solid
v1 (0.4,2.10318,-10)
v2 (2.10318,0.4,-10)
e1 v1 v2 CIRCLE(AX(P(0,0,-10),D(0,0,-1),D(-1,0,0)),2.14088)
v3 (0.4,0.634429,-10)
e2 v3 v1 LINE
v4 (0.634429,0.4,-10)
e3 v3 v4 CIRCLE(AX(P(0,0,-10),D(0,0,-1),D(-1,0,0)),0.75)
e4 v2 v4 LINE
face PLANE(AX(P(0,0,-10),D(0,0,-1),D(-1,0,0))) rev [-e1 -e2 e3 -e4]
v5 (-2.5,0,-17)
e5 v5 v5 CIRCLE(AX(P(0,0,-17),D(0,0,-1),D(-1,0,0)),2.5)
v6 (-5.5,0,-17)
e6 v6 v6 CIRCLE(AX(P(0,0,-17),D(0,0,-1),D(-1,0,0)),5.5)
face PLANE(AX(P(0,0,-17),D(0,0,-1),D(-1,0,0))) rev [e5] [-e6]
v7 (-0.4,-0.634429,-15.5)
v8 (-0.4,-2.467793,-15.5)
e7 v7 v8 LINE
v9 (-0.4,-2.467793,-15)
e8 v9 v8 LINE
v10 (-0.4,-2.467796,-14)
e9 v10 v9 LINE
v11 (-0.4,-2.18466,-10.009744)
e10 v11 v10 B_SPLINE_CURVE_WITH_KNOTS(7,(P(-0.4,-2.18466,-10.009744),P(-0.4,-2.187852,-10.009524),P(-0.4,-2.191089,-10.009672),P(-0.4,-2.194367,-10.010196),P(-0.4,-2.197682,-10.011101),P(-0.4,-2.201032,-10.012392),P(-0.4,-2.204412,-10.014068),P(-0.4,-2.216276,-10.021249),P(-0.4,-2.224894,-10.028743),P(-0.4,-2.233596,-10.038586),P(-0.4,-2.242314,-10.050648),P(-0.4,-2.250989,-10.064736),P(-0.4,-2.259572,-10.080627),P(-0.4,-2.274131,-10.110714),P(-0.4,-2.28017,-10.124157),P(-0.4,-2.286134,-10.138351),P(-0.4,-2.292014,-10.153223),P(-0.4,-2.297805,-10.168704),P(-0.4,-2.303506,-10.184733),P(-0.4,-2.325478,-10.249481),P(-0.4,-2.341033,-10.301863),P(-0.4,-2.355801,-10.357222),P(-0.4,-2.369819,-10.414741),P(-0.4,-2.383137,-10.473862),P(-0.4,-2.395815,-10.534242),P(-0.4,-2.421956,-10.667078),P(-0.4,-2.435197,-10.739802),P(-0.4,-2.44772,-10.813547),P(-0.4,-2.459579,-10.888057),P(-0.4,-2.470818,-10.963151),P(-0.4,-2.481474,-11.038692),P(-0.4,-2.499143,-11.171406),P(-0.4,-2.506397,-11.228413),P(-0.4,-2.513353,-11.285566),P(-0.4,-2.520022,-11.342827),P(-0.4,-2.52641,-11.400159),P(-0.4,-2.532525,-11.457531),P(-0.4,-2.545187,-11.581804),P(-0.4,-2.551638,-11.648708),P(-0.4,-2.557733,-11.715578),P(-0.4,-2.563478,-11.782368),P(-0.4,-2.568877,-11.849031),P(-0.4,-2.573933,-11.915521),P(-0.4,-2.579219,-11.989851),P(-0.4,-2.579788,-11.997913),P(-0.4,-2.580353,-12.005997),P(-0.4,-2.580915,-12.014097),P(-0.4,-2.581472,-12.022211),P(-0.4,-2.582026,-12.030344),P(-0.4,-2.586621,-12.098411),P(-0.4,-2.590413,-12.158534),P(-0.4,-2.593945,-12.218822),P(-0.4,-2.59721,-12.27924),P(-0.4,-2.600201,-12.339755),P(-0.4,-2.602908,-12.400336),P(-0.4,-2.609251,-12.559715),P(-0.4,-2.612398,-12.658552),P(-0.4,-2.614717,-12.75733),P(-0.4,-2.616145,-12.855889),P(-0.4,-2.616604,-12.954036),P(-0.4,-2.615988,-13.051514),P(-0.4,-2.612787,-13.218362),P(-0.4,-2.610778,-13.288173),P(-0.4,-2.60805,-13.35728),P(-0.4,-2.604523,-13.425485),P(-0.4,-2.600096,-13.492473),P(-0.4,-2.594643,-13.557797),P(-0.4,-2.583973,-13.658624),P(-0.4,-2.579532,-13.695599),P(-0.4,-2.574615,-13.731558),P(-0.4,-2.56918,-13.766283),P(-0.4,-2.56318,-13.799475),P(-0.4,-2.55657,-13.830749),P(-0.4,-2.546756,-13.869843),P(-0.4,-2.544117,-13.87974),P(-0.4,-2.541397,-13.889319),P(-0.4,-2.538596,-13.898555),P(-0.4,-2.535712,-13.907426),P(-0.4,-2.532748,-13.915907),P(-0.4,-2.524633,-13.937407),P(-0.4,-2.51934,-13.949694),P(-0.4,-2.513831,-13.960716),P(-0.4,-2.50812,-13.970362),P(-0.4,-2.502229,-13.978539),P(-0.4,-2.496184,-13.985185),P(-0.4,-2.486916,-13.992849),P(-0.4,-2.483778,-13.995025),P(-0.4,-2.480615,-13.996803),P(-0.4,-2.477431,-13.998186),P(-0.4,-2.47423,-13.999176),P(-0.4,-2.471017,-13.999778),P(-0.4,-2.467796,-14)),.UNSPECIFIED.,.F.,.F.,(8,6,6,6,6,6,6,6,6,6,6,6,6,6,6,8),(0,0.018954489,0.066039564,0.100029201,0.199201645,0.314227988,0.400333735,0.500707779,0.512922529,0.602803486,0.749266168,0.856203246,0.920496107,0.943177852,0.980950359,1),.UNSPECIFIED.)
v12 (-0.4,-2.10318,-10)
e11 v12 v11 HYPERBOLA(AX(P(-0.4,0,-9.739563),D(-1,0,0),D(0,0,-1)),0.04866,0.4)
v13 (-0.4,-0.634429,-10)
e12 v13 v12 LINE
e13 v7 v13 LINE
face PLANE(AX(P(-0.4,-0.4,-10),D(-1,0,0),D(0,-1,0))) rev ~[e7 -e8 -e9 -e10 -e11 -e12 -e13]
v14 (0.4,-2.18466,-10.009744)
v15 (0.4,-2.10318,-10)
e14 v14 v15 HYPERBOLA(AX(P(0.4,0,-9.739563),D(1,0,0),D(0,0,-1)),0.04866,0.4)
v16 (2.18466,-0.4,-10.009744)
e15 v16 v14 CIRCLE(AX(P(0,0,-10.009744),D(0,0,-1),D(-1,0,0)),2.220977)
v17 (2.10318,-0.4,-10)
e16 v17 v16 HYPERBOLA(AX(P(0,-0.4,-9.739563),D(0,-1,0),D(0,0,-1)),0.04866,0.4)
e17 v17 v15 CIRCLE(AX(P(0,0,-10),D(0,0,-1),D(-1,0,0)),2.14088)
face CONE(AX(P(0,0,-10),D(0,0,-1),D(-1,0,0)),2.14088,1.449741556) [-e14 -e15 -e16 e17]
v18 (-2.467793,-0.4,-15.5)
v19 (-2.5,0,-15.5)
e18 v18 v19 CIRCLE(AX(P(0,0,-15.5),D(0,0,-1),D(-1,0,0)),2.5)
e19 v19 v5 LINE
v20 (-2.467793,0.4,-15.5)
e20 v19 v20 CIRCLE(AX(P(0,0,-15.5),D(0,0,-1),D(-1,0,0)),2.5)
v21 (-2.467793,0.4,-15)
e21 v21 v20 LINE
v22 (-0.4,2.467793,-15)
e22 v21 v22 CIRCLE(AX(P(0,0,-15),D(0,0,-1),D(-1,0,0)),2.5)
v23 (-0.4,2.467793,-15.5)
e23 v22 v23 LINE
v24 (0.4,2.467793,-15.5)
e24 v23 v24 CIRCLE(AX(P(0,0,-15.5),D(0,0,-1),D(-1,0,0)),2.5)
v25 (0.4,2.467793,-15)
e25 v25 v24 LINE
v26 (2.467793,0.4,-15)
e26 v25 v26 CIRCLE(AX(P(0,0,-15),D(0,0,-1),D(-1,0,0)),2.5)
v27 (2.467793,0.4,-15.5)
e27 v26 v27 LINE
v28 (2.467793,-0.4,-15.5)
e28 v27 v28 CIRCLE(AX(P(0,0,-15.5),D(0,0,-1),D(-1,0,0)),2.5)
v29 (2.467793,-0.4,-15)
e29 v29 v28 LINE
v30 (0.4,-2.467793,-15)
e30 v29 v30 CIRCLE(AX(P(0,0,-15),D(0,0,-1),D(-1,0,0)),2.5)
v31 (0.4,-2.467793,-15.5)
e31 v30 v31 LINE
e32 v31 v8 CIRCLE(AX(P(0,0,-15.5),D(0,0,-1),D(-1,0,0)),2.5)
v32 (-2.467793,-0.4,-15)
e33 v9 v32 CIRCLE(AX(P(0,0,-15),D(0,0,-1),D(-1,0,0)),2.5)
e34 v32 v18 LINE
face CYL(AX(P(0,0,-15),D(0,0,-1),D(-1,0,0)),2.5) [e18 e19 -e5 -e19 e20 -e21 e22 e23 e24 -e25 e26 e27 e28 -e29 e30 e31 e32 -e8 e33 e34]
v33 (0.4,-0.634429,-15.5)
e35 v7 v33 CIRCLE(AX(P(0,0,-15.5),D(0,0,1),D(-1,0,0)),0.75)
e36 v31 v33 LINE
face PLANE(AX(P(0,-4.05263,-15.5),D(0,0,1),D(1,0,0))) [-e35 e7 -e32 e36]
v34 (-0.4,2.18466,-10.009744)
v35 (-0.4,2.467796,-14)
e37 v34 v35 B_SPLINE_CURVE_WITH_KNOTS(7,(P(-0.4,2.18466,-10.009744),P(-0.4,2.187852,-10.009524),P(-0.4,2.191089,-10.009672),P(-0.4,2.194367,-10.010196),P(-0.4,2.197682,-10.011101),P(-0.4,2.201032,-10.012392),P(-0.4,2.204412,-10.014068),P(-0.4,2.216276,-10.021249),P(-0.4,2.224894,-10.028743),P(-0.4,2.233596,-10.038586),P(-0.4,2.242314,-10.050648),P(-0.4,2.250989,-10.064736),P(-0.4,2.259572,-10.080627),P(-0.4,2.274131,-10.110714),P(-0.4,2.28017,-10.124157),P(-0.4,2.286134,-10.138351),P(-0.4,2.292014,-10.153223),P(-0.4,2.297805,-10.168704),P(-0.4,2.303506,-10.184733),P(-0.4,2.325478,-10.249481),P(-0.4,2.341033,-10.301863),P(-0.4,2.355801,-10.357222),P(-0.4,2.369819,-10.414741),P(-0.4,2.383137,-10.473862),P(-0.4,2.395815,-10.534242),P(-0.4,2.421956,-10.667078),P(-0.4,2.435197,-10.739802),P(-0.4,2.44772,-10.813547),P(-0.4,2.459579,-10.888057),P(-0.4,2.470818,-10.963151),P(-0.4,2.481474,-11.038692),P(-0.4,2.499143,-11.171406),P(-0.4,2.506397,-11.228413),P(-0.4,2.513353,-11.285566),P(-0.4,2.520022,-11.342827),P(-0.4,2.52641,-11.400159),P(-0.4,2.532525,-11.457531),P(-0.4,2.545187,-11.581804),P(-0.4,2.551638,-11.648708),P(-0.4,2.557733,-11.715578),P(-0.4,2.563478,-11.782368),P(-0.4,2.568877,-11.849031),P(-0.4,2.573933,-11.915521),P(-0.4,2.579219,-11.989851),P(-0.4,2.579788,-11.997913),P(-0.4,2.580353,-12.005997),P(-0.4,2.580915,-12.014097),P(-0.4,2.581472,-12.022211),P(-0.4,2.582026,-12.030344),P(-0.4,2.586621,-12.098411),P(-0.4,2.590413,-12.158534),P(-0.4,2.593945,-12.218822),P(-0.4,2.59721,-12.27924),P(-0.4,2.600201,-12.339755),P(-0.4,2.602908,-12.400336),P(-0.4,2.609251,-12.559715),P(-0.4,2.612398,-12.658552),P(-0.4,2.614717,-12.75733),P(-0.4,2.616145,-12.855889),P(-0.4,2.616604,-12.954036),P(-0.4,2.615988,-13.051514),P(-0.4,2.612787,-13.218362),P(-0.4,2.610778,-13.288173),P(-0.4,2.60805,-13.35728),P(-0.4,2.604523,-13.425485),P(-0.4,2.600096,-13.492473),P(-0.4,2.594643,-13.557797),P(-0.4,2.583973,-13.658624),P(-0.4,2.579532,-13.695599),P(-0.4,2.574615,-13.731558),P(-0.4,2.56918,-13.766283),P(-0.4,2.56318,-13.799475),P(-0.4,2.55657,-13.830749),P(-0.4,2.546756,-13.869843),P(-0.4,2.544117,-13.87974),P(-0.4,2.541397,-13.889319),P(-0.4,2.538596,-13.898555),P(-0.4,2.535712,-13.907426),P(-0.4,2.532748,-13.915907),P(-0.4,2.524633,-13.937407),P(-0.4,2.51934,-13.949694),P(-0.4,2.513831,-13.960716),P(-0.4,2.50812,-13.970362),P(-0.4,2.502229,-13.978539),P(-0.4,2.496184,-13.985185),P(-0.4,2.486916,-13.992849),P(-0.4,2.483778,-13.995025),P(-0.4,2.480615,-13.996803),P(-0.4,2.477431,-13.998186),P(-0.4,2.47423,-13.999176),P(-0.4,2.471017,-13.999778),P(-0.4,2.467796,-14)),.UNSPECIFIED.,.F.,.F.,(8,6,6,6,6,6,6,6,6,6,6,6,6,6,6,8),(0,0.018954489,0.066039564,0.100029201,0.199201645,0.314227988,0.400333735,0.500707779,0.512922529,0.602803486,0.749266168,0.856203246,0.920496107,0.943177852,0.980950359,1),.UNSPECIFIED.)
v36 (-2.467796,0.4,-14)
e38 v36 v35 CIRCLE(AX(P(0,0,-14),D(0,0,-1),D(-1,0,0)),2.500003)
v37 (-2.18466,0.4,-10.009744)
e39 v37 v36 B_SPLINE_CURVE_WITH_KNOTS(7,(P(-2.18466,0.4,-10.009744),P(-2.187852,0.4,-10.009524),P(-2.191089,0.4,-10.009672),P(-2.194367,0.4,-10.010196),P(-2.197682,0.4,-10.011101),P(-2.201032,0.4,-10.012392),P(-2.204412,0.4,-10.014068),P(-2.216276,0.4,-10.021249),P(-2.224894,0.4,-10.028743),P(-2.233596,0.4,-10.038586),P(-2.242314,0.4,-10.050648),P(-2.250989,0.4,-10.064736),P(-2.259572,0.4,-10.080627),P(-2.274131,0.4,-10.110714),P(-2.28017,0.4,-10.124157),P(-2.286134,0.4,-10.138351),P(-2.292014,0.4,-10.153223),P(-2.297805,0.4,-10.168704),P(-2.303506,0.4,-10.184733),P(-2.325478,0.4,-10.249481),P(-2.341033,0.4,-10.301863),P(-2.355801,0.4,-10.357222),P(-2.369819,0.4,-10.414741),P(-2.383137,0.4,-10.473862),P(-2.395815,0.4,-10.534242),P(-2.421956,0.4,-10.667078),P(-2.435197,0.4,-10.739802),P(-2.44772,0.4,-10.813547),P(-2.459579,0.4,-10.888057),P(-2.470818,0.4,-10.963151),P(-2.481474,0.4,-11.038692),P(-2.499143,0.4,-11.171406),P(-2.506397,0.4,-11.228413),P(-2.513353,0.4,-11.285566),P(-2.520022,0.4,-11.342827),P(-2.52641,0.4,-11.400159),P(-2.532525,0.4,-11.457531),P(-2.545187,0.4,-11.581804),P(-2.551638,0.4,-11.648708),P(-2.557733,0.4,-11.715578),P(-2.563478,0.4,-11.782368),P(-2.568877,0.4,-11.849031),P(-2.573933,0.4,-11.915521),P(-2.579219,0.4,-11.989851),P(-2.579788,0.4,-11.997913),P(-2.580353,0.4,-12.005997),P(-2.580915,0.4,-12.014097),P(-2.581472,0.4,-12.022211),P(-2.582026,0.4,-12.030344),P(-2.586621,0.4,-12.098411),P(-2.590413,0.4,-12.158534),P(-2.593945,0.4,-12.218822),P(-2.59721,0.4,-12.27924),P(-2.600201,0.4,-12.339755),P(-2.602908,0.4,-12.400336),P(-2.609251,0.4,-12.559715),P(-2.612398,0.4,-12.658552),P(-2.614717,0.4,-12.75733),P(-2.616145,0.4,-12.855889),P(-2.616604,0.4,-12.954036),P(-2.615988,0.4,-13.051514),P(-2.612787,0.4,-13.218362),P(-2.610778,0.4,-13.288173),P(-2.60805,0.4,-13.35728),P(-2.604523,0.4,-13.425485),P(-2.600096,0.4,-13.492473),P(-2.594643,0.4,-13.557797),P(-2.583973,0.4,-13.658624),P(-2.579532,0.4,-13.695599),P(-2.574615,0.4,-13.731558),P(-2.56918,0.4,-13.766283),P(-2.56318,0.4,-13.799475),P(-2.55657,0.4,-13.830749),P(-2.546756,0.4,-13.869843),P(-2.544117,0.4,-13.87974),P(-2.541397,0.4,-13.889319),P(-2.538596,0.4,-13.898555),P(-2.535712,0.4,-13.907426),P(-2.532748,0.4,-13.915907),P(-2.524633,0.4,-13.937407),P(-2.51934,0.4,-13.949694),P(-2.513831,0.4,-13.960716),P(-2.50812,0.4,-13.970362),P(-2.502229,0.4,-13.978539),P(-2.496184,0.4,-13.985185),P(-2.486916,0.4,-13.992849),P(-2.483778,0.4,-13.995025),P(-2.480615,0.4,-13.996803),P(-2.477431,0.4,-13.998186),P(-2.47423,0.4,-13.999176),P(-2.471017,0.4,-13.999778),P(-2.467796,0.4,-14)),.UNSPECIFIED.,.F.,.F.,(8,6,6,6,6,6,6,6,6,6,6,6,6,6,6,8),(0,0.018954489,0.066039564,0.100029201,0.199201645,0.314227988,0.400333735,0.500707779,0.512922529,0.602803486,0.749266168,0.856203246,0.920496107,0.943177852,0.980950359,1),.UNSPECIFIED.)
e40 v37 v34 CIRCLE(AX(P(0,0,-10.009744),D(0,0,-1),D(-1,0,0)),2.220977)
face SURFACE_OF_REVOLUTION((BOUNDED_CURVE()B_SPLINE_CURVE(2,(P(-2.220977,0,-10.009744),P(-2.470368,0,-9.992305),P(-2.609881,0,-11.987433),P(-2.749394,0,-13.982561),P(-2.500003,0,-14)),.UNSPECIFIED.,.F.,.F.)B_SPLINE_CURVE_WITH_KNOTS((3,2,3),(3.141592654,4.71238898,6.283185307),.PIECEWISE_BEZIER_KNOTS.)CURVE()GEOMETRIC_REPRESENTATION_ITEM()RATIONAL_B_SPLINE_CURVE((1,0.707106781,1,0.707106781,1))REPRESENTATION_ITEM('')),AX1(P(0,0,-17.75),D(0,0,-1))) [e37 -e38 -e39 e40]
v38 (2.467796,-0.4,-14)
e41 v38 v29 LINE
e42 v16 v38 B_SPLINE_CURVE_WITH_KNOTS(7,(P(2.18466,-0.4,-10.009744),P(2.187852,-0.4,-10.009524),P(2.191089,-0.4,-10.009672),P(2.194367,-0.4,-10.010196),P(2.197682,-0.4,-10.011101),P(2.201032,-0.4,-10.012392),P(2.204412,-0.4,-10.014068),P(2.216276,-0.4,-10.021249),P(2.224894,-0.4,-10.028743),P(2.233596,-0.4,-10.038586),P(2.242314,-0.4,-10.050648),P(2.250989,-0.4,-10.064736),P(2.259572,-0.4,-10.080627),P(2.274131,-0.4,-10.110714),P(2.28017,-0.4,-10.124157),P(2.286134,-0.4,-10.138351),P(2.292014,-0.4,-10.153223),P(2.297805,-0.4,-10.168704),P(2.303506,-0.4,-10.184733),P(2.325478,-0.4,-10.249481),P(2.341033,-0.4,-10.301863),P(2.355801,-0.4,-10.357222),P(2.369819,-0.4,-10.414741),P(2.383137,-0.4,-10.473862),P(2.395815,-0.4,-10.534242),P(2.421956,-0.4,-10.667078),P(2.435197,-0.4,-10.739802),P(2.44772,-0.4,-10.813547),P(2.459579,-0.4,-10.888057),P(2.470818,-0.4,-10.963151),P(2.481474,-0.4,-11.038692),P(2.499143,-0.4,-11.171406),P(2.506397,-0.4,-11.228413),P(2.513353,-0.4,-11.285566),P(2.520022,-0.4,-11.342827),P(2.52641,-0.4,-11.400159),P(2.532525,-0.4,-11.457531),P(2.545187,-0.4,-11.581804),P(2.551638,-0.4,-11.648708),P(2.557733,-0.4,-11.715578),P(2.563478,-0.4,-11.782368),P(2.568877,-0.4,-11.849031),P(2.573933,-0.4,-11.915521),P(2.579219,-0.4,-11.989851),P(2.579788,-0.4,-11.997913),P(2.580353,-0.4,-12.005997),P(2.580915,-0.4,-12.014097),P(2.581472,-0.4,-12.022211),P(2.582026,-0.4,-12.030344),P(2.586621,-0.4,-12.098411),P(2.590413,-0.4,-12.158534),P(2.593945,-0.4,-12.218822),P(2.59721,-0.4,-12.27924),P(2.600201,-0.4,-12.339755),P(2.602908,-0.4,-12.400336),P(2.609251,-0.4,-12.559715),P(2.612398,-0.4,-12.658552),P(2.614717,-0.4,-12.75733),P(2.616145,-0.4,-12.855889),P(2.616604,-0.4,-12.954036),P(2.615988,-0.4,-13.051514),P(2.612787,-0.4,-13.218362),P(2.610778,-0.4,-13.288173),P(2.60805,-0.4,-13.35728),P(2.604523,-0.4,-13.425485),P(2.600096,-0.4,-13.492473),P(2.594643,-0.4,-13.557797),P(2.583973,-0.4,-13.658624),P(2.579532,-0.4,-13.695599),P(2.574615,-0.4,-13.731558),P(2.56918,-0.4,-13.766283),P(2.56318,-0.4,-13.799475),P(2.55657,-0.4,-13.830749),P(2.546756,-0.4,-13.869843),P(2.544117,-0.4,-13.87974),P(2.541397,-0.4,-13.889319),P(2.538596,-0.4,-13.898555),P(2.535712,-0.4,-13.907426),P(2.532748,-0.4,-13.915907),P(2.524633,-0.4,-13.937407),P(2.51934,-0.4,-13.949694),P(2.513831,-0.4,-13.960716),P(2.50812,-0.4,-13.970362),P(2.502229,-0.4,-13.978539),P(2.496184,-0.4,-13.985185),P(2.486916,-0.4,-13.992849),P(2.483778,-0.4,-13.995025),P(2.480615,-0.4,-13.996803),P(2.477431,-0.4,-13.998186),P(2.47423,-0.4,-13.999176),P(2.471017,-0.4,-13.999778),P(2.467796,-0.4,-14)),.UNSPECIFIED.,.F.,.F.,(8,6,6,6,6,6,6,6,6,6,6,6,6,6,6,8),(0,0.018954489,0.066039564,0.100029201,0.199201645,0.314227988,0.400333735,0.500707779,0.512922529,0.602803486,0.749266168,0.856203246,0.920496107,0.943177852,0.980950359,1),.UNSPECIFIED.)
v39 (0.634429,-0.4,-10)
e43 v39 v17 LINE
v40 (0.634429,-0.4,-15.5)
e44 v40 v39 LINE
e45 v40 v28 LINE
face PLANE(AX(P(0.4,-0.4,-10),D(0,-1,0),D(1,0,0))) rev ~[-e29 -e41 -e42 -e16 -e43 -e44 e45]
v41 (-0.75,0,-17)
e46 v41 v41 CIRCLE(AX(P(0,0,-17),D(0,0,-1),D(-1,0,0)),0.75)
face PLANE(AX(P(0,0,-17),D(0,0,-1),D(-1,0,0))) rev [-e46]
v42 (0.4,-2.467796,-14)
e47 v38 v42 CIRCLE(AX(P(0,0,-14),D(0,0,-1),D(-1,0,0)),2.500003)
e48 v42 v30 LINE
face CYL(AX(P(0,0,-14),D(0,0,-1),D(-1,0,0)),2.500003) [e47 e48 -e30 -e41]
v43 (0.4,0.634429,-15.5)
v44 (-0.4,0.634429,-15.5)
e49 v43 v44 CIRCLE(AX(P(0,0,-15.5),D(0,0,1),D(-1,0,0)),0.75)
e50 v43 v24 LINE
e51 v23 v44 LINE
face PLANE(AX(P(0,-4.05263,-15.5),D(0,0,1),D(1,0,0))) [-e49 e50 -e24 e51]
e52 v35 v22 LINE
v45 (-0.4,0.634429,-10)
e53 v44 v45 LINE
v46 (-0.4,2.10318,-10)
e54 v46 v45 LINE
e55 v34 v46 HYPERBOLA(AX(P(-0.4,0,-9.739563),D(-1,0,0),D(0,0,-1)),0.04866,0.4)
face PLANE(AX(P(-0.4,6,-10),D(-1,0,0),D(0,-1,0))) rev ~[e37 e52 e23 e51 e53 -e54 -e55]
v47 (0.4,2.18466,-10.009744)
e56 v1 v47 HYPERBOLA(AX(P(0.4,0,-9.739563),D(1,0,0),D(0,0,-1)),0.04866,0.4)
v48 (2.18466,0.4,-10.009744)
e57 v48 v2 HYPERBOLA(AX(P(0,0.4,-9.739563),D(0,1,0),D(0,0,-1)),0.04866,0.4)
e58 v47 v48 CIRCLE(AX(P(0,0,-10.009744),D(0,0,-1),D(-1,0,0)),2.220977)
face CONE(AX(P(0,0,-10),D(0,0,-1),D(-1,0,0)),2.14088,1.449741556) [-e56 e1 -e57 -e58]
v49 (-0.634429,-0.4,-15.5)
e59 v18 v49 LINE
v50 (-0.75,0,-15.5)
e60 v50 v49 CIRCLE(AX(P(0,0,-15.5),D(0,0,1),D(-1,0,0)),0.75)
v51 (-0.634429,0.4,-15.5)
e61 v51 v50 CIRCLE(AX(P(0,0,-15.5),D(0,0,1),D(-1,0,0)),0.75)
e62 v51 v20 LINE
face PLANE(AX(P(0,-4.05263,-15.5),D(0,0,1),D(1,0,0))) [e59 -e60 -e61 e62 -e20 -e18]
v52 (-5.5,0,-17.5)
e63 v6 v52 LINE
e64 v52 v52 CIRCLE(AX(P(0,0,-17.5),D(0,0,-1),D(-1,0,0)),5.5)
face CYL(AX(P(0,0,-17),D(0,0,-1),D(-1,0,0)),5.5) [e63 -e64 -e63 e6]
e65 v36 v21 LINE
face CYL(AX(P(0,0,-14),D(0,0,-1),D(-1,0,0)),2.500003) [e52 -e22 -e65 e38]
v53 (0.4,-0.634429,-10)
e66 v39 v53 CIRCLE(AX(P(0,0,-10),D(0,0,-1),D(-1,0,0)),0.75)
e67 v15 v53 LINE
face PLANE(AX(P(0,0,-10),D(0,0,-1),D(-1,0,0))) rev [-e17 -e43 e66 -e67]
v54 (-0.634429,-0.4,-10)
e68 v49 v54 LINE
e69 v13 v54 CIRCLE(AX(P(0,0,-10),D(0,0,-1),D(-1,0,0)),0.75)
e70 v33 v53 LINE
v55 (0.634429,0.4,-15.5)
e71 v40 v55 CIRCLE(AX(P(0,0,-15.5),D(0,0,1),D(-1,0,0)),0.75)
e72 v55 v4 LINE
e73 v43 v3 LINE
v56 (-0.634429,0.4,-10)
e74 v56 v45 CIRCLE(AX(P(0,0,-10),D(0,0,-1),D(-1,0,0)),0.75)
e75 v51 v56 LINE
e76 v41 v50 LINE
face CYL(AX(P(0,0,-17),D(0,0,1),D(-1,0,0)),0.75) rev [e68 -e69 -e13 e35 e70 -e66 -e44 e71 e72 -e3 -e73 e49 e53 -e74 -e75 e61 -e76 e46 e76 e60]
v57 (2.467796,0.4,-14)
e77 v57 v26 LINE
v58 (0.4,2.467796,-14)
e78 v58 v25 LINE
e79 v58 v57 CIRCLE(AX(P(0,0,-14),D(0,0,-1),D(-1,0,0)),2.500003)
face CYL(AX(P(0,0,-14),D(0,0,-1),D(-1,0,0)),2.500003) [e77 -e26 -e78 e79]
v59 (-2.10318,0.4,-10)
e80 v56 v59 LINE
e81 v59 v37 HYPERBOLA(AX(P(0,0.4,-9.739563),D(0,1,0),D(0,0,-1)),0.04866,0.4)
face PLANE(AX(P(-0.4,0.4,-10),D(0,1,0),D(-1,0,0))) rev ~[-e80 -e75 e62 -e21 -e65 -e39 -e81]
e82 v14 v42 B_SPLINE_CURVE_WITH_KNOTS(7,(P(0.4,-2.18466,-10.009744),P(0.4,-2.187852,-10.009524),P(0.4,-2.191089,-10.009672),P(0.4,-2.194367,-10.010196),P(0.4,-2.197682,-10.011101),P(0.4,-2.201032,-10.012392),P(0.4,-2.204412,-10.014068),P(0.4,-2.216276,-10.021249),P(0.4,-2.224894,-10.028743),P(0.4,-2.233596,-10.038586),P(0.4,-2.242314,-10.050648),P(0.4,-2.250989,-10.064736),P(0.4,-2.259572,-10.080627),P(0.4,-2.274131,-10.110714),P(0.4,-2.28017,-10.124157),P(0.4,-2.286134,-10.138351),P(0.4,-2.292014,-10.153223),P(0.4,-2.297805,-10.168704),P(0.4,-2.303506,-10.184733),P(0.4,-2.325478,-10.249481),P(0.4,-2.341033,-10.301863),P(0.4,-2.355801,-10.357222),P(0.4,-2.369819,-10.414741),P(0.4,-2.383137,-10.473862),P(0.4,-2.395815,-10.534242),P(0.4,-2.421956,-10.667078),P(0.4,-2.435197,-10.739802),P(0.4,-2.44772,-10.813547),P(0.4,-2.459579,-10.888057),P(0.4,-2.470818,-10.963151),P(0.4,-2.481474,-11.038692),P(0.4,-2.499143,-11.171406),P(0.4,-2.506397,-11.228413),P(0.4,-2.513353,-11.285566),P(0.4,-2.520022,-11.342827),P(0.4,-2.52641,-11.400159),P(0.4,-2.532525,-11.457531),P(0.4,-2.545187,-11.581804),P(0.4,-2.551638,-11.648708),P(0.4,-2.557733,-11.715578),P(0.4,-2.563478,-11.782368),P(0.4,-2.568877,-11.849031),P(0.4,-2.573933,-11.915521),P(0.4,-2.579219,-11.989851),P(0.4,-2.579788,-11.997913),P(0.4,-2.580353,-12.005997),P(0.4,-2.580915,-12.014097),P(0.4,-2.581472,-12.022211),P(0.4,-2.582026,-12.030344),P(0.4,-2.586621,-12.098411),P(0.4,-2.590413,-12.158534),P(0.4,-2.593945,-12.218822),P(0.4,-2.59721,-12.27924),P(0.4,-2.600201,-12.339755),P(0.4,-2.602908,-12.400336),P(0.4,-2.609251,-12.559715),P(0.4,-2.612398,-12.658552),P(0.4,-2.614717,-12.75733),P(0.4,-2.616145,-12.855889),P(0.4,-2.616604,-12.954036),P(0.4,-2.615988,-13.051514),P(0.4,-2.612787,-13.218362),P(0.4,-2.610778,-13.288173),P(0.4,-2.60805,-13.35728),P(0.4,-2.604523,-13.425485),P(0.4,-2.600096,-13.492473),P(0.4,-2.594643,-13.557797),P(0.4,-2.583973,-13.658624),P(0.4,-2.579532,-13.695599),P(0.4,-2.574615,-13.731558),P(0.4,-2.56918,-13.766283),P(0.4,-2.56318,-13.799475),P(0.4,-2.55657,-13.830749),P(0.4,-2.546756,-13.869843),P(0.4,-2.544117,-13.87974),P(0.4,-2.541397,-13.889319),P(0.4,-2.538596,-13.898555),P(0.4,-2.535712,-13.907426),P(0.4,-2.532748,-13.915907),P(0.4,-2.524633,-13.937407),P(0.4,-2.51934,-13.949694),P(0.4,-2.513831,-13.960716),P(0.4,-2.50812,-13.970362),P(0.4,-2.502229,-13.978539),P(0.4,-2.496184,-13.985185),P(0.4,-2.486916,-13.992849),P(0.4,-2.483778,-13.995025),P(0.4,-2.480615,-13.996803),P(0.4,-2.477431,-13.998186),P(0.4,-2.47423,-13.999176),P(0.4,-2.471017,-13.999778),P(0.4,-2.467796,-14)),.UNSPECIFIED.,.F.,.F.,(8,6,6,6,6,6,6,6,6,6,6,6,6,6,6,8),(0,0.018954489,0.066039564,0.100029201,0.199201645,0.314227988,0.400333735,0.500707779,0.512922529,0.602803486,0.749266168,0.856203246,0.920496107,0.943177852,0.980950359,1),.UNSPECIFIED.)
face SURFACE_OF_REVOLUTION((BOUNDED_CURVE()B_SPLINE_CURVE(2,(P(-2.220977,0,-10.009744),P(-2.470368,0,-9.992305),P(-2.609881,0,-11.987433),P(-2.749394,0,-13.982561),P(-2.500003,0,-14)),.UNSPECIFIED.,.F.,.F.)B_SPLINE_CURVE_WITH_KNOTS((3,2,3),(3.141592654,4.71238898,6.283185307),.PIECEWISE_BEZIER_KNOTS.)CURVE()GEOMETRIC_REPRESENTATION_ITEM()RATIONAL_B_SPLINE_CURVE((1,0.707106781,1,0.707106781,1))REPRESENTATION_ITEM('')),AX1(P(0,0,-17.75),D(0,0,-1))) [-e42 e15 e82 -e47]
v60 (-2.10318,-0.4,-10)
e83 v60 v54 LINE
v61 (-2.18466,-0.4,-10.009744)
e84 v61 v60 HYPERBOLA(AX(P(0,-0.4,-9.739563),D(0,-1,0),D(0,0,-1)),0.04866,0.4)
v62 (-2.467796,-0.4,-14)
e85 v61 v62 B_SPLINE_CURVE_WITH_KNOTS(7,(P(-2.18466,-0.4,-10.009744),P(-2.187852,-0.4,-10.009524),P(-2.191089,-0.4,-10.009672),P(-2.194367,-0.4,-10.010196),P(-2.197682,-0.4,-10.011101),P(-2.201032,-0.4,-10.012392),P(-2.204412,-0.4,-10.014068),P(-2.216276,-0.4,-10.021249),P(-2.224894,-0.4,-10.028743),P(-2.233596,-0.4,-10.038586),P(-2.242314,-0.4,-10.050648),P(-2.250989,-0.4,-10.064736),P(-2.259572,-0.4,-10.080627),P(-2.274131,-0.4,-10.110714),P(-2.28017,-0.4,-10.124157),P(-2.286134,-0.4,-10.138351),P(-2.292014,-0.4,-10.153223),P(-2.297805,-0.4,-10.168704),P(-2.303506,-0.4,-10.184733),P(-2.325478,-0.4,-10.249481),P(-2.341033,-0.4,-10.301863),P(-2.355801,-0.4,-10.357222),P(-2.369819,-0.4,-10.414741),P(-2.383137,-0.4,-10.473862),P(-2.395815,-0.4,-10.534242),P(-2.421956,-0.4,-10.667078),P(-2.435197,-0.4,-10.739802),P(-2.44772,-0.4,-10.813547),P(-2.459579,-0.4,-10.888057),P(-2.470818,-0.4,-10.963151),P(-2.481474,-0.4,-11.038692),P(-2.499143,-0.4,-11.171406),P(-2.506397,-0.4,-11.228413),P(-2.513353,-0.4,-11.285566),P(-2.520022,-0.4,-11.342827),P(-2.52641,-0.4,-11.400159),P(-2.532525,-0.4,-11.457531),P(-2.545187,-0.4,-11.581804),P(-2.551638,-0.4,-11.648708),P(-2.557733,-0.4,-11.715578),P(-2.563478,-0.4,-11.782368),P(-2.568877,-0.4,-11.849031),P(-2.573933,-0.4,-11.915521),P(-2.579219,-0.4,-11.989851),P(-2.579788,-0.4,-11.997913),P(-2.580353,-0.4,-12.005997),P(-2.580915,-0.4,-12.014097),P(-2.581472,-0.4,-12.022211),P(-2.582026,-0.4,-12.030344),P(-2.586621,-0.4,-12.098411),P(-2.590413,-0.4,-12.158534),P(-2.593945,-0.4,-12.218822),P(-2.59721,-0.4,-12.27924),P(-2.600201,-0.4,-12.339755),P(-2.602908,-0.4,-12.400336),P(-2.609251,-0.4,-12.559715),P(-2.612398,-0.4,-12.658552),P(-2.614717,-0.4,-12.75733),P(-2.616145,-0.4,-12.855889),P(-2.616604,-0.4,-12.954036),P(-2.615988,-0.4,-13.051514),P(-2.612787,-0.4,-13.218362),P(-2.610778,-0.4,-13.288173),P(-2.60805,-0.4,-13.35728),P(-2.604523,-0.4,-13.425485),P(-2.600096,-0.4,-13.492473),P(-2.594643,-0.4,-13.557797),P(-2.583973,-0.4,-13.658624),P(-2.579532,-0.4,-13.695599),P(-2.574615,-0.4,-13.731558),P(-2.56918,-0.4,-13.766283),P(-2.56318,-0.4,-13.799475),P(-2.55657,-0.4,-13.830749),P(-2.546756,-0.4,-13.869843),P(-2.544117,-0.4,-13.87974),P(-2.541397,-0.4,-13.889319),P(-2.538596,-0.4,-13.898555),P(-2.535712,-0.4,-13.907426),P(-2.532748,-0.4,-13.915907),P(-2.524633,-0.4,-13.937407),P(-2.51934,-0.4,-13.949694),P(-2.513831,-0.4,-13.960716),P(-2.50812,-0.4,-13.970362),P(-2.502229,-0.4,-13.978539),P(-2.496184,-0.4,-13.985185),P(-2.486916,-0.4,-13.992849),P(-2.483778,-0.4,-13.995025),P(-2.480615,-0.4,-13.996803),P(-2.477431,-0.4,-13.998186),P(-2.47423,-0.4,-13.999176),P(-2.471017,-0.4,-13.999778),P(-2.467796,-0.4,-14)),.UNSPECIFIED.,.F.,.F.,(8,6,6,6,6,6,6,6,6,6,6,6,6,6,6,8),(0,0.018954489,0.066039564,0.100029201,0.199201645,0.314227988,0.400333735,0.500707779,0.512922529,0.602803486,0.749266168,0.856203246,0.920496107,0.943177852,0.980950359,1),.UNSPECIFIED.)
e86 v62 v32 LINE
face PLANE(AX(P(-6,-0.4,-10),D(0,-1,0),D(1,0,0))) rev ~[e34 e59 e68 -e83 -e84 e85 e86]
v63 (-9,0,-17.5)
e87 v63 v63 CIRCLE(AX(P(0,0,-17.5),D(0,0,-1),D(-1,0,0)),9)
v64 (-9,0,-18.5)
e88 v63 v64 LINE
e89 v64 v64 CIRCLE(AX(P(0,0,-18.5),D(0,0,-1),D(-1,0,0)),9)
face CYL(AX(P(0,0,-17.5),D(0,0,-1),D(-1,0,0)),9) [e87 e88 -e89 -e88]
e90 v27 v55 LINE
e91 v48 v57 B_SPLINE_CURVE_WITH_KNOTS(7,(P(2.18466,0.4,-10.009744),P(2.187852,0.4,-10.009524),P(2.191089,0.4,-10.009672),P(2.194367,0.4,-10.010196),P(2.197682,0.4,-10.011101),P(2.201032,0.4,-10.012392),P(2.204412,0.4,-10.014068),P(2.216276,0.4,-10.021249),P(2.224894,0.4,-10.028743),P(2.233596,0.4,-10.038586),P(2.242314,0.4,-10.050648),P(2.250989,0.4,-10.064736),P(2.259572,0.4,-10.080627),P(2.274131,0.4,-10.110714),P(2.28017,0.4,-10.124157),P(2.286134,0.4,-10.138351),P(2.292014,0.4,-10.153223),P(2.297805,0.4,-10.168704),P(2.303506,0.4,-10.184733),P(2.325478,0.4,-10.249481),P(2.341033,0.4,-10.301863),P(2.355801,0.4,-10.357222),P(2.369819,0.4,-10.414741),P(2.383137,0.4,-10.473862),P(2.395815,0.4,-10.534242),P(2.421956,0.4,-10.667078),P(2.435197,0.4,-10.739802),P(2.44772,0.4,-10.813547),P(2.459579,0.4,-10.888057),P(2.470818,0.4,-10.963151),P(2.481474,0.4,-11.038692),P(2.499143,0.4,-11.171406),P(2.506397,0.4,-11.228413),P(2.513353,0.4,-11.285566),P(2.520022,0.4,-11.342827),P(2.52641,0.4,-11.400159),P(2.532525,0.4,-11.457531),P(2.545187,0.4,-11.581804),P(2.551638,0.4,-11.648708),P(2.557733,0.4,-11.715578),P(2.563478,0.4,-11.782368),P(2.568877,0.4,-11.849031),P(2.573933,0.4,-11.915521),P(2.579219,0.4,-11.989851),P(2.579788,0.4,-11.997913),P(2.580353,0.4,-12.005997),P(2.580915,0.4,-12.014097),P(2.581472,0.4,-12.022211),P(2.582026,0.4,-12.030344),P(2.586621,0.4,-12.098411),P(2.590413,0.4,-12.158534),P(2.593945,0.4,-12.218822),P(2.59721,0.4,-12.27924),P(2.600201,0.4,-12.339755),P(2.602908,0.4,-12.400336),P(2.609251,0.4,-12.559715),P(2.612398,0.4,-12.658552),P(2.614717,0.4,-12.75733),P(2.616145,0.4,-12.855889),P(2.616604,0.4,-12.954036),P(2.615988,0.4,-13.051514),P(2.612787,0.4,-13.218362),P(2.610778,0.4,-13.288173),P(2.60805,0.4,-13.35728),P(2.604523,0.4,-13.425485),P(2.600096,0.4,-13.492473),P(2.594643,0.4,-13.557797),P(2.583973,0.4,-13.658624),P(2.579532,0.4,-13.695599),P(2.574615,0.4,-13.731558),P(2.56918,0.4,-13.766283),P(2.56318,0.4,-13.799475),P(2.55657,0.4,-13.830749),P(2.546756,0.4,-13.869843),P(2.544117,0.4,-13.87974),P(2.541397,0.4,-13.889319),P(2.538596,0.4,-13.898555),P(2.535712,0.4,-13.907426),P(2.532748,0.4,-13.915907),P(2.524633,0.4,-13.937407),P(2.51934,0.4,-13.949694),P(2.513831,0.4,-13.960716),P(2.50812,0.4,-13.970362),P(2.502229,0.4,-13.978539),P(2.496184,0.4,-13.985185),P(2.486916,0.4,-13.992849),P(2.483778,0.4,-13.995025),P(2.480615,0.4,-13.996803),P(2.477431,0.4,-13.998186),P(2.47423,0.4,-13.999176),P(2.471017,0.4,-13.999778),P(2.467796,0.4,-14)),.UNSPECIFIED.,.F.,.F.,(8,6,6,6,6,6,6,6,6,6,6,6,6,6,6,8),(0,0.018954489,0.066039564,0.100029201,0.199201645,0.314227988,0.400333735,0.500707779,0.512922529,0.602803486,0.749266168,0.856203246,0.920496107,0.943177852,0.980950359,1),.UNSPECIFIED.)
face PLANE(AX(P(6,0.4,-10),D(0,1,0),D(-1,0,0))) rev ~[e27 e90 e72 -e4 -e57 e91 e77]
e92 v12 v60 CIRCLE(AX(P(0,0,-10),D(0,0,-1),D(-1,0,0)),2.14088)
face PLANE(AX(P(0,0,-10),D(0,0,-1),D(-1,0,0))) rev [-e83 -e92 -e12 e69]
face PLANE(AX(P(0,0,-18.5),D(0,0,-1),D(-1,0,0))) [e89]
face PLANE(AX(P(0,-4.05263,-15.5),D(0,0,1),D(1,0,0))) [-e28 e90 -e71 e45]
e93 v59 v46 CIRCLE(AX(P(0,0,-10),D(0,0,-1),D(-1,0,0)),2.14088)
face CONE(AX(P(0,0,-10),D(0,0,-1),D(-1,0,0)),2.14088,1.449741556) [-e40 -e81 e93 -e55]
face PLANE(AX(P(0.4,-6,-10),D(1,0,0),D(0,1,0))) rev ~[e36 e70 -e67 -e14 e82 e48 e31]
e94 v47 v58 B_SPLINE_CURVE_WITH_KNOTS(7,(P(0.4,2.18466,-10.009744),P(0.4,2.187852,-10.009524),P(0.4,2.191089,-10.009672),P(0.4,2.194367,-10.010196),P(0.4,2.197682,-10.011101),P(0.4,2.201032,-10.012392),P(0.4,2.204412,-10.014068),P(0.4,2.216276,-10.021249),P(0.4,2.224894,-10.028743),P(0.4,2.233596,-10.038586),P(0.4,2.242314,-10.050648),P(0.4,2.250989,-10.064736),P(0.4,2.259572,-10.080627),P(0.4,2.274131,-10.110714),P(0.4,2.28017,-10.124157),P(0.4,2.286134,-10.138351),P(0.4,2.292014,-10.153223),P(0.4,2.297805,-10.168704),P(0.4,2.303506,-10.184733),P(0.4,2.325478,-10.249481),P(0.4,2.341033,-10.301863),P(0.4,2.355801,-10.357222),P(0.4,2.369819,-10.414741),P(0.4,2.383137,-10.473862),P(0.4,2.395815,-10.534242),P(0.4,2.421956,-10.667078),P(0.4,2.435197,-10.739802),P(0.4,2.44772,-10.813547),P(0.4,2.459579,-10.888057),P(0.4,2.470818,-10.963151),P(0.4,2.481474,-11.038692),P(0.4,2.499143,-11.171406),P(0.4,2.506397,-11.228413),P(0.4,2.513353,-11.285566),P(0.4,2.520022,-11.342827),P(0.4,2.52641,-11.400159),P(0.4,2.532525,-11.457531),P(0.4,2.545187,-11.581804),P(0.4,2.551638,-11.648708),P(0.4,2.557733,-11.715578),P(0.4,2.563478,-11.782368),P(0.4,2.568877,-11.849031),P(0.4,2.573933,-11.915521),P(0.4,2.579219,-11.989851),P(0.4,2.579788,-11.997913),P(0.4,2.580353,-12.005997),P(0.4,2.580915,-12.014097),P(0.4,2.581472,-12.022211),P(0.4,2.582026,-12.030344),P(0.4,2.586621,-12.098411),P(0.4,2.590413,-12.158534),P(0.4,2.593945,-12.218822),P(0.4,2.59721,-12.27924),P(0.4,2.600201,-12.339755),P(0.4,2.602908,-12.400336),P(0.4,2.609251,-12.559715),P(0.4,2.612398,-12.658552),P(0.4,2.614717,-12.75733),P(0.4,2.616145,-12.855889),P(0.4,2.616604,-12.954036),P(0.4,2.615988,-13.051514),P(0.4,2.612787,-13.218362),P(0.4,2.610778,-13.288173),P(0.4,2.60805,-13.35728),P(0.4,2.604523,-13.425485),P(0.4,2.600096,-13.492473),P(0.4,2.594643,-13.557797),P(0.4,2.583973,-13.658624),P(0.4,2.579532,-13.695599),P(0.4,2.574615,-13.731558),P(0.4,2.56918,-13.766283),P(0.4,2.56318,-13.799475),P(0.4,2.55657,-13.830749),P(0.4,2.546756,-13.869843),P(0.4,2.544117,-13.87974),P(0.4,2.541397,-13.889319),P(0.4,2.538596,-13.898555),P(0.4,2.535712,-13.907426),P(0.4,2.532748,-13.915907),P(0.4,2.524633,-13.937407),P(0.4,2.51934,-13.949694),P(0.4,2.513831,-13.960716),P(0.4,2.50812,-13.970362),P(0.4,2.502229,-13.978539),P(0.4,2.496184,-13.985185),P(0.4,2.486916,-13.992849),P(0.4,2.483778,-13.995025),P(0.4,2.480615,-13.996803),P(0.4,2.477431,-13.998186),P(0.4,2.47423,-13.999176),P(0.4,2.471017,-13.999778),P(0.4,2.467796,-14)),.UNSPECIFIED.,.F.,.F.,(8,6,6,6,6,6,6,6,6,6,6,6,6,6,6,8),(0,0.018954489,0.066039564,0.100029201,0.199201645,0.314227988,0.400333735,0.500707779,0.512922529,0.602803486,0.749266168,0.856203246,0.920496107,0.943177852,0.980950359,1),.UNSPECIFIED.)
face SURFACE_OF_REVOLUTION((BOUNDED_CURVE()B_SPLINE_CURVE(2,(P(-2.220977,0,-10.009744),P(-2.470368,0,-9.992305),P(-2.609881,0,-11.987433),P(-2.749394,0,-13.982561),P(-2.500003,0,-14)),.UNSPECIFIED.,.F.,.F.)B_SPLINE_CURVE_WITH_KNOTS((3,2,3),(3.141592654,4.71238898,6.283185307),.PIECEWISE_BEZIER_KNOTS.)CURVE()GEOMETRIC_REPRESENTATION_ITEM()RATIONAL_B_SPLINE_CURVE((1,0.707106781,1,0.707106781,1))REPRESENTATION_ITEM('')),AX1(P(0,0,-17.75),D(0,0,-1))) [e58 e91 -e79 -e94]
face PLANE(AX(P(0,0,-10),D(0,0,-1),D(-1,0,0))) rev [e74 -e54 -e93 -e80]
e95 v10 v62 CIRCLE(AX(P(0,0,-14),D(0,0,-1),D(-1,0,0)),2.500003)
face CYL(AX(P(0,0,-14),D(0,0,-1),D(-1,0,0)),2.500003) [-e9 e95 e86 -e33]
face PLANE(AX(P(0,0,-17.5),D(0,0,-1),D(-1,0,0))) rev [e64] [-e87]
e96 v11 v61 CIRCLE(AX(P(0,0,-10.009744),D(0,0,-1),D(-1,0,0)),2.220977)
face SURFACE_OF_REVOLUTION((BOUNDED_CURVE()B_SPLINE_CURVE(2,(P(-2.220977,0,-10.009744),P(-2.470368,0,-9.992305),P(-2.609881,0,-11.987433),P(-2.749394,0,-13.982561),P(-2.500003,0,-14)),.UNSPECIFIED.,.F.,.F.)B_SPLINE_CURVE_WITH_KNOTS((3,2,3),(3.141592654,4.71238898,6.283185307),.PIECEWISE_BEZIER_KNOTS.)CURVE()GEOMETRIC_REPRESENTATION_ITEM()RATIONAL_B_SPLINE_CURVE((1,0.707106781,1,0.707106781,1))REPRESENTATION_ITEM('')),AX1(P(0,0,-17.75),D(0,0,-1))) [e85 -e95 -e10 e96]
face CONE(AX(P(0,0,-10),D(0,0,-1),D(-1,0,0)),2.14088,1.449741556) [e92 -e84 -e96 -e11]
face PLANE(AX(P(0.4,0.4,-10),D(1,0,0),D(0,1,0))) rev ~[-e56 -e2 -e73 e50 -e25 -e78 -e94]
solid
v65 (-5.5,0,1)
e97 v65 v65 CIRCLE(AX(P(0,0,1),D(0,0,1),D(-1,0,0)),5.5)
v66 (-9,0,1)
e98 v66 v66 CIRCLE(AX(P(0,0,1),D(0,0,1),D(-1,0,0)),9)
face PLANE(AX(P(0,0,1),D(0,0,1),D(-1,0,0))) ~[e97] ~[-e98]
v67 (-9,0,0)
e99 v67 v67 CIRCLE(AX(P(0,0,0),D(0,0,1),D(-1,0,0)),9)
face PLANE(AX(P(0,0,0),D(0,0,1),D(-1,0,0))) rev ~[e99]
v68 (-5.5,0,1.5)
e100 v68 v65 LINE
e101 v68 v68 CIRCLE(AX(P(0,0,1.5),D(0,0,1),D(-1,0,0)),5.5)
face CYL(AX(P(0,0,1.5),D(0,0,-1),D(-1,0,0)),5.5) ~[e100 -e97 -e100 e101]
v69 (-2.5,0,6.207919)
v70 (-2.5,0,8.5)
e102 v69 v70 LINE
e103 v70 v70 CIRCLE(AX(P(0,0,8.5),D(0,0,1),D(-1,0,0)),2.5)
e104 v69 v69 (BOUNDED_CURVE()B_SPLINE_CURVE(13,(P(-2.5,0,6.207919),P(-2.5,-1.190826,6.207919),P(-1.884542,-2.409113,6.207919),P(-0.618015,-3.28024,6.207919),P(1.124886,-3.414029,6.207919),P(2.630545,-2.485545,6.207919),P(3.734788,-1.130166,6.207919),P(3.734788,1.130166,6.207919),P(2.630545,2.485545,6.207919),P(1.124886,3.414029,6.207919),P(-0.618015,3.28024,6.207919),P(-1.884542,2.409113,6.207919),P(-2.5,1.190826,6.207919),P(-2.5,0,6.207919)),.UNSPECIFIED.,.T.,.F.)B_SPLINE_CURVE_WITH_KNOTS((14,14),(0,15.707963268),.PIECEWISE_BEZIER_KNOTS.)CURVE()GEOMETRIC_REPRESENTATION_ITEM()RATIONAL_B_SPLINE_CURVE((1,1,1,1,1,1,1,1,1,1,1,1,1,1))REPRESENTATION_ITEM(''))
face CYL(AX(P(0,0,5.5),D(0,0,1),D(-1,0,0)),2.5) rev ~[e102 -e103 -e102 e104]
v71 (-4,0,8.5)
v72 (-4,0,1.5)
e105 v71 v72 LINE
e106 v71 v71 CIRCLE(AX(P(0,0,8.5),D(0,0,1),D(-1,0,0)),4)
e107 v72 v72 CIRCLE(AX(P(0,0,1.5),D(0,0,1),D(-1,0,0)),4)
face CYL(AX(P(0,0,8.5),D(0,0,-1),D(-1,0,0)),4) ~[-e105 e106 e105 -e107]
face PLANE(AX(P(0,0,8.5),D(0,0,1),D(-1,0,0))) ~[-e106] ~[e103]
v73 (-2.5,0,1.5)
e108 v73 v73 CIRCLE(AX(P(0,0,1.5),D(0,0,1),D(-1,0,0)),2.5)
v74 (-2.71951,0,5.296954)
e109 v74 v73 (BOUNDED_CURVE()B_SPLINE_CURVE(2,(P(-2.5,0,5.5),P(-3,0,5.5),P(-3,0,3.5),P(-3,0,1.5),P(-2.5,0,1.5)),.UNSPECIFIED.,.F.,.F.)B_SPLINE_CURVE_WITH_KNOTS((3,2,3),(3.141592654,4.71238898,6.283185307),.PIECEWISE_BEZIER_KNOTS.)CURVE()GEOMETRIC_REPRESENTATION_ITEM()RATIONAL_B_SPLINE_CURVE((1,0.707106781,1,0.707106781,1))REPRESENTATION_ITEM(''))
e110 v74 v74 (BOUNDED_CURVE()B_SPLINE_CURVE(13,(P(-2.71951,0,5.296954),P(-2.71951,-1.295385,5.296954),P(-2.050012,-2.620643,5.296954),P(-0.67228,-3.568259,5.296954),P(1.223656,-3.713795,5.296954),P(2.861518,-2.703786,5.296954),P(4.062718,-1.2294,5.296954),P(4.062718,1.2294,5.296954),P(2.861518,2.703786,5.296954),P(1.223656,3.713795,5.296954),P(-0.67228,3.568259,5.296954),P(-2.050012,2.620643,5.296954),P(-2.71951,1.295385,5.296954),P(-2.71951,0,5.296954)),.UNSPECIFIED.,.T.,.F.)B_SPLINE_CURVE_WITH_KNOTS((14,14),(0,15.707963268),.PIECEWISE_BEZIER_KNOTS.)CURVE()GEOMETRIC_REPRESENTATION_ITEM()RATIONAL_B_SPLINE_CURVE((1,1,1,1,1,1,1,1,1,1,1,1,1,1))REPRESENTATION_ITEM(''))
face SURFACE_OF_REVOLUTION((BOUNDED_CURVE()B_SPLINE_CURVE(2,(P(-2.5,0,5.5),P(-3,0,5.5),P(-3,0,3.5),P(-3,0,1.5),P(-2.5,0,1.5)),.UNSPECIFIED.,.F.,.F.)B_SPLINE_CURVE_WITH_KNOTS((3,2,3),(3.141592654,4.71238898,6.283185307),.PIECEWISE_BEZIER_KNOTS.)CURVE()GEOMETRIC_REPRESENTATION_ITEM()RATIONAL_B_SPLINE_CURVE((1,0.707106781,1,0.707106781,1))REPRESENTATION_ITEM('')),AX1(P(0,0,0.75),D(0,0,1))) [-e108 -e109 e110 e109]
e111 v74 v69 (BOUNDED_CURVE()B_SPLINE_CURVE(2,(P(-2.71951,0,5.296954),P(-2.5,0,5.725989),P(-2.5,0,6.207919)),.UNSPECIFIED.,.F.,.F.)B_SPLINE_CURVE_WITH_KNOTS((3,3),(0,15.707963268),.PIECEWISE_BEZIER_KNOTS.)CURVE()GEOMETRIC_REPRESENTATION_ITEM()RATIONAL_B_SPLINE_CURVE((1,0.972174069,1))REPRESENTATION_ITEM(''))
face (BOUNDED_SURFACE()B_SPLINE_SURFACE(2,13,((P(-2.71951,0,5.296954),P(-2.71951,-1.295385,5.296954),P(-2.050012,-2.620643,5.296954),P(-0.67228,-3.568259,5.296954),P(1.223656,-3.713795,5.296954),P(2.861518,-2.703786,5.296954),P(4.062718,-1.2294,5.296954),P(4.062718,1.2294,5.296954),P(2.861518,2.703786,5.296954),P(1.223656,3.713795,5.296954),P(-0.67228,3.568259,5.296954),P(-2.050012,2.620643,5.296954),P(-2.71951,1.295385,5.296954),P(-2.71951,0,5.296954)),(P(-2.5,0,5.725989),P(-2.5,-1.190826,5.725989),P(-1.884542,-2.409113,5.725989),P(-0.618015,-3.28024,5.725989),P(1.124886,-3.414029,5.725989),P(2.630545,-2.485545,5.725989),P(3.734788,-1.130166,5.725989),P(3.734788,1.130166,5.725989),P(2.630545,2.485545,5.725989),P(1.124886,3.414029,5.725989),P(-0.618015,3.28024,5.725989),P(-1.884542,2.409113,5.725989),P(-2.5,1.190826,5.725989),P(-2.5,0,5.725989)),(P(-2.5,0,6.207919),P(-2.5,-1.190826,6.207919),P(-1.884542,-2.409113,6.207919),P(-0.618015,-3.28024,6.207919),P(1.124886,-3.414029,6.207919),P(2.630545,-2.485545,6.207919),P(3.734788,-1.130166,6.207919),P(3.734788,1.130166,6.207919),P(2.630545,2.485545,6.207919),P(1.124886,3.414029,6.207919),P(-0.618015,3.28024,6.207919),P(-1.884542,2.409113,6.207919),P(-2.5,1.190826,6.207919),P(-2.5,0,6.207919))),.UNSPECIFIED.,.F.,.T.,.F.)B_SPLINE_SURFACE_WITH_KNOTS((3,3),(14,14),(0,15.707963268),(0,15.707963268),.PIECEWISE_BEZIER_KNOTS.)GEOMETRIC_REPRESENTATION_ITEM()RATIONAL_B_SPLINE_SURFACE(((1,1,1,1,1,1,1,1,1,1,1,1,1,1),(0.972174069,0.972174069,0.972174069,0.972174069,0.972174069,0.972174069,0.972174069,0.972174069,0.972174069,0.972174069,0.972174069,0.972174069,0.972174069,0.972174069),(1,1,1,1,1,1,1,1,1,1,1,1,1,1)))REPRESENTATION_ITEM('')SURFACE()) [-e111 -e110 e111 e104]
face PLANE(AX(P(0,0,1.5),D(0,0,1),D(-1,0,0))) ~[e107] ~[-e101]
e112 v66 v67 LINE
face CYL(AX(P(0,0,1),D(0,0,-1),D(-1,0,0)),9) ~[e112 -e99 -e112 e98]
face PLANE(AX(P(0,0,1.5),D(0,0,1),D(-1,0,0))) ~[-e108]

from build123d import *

# Parameters (mm, degrees)
F2_R     = 2
F4_W     = 0.8
F4_H     = 0.8
F5_DEPTH = 5.5


# Not quite as in the source:
# - ends of sketch curves that miss each other by under 0.0002 mm in the source are joined


with BuildPart() as f1:
    # F0 (on Front) → F1 (revolve)
    with BuildSketch(Plane.XZ):
        with BuildLine():
            Line((-9, 0), (0, 0))
            Line((0, 0), (0, 1.5))
            Line((0, 1.5), (-2.5, 1.5))
            add(Edge.make_bspline(
                [(-2.5, 5.5), (-3, 5.5), (-3, 3.5), (-3, 1.5), (-2.5, 1.5)],
                knots=[3.1415926536, 3.1415926536, 3.1415926536, 4.7123889804, 4.7123889804, 6.2831853072, 6.2831853072, 6.2831853072], degree=2, weights=[1, 0.7071067812, 1, 0.7071067812, 1]))
            Line((-2.5, 5.5), (-2.5, 8.5))
            Line((-2.5, 8.5), (-4, 8.5))
            Line((-4, 8.5), (-4, 1.5))
            Line((-4, 1.5), (-5.5, 1.5))
            Line((-5.5, 1.5), (-5.5, 1))
            Line((-5.5, 1), (-9, 1))
            Line((-9, 1), (-9, 0))
        make_face()
    revolve(axis=Axis((0, 0, 0.75), (0, 0, 1)))

    # F2
    f2_edges = [f1.edges().sort_by_distance(p)[0] for p in [
        (2.5, 0, 5.5),
    ]]
    fillet(f2_edges, radius=F2_R)


with BuildPart() as f3:
    # F0 (on Front) → F3 (revolve)
    with BuildSketch(Plane.XZ):
        with BuildLine():
            Line((-9, -18.5), (0, -18.5))
            Line((0, -18.5), (0, -17))
            Line((0, -17), (-0.75, -17))
            Line((-0.75, -17), (-0.75, -10))
            Line((-0.75, -10), (-2.14088, -10))
            Line((-2.14088, -10), (-2.2209772679, -10.009743799))
            add(Edge.make_bspline(
                [(-2.2209772679, -10.009743799), (-2.4703682805, -9.9923046805), (-2.609881228, -11.987432781), (-2.7493941755, -13.9825608816), (-2.5000031629, -14)],
                knots=[3.1415926536, 3.1415926536, 3.1415926536, 4.7123889804, 4.7123889804, 6.2831853072, 6.2831853072, 6.2831853072], degree=2, weights=[1, 0.7071067812, 1, 0.7071067812, 1]))
            Line((-2.5000031629, -14), (-2.5, -15))
            Line((-2.5, -15), (-2.5, -17))
            Line((-2.5, -17), (-4, -17))
            Line((-4, -17), (-5.5, -17))
            Line((-5.5, -17), (-5.5, -17.5))
            Line((-5.5, -17.5), (-9, -17.5))
            Line((-9, -17.5), (-9, -18.5))
        make_face()
    revolve(axis=Axis((0, 0, -17.75), (0, 0, -1)))

    # F4 (on face) → F5 (cut)
    with BuildSketch(Plane.XY.offset(-10)):
        with BuildLine():
            Line((-0.4, -6), (0.4, -6))
            Line((0.4, -6), (0.4, -2.1031802525))
            ThreePointArc((0.4, -2.1031802525), (0, -2.14088), (-0.4, -2.1031802525))
            Line((-0.4, -2.1031802525), (-0.4, -6))
        make_face()
        with BuildLine():
            ThreePointArc((-0.4, -2.1031802525), (0, -2.14088), (0.4, -2.1031802525))
            Line((0.4, -2.1031802525), (0.4, -0.634428877))
            ThreePointArc((0.4, -0.634428877), (0, -0.75), (-0.4, -0.634428877))
            Line((-0.4, -0.634428877), (-0.4, -2.1031802525))
        make_face()
        with BuildLine():
            ThreePointArc((-0.4, -0.634428877), (0, -0.75), (0.4, -0.634428877))
            Line((0.4, -0.634428877), (0.4, -0.4))
            Line((0.4, -0.4), (-0.4, -0.4))
            Line((-0.4, -0.4), (-0.4, -0.634428877))
        make_face()
        with BuildLine():
            Line((-0.634428877, -0.4), (-0.4, -0.4))
            Line((-0.4, -0.4), (-0.4, 0.4))
            Line((-0.4, 0.4), (-0.634428877, 0.4))
            ThreePointArc((-0.634428877, 0.4), (-0.75, 0), (-0.634428877, -0.4))
        make_face()
        with BuildLine():
            Line((-6, -0.4), (-2.1031802525, -0.4))
            ThreePointArc((-2.1031802525, -0.4), (-2.14088, 0), (-2.1031802525, 0.4))
            Line((-2.1031802525, 0.4), (-6, 0.4))
            Line((-6, 0.4), (-6, -0.4))
        make_face()
        Rectangle(F4_W, F4_H)
        with BuildLine():
            Line((-0.4, 0.4), (0.4, 0.4))
            Line((0.4, 0.4), (0.4, 0.634428877))
            ThreePointArc((0.4, 0.634428877), (0, 0.75), (-0.4, 0.634428877))
            Line((-0.4, 0.634428877), (-0.4, 0.4))
        make_face()
        with BuildLine():
            ThreePointArc((0.4, 2.1031802525), (0, 2.14088), (-0.4, 2.1031802525))
            Line((-0.4, 2.1031802525), (-0.4, 0.634428877))
            ThreePointArc((-0.4, 0.634428877), (0, 0.75), (0.4, 0.634428877))
            Line((0.4, 0.634428877), (0.4, 2.1031802525))
        make_face()
        with BuildLine():
            Line((-0.4, 6), (-0.4, 2.1031802525))
            ThreePointArc((-0.4, 2.1031802525), (0, 2.14088), (0.4, 2.1031802525))
            Line((0.4, 2.1031802525), (0.4, 6))
            Line((0.4, 6), (-0.4, 6))
        make_face()
        with BuildLine():
            Line((0.634428877, -0.4), (2.1031802525, -0.4))
            ThreePointArc((2.1031802525, -0.4), (2.1314342253, -0.2008863304), (2.14088, 0))
            ThreePointArc((2.14088, 0), (2.1314342253, 0.2008863304), (2.1031802525, 0.4))
            Line((2.1031802525, 0.4), (0.634428877, 0.4))
            ThreePointArc((0.634428877, 0.4), (0.7205281597, 0.2081806214), (0.75, 0))
            ThreePointArc((0.75, 0), (0.7205281597, -0.2081806214), (0.634428877, -0.4))
        make_face()
        with BuildLine():
            Line((0.4, 0.4), (0.4, -0.4))
            Line((0.4, -0.4), (0.634428877, -0.4))
            ThreePointArc((0.634428877, -0.4), (0.7205281597, -0.2081806214), (0.75, 0))
            ThreePointArc((0.75, 0), (0.7205281597, 0.2081806214), (0.634428877, 0.4))
            Line((0.634428877, 0.4), (0.4, 0.4))
        make_face()
        with BuildLine():
            ThreePointArc((2.14088, 0), (2.1314342253, -0.2008863304), (2.1031802525, -0.4))
            Line((2.1031802525, -0.4), (6, -0.4))
            Line((6, -0.4), (6, 0.4))
            Line((6, 0.4), (2.1031802525, 0.4))
            ThreePointArc((2.1031802525, 0.4), (2.1314342253, 0.2008863304), (2.14088, 0))
        make_face()
        with BuildLine():
            ThreePointArc((-2.1031802525, 0.4), (-2.14088, 0), (-2.1031802525, -0.4))
            Line((-2.1031802525, -0.4), (-0.634428877, -0.4))
            ThreePointArc((-0.634428877, -0.4), (-0.75, 0), (-0.634428877, 0.4))
            Line((-0.634428877, 0.4), (-2.1031802525, 0.4))
        make_face()
    extrude(amount=-F5_DEPTH, mode=Mode.SUBTRACT)


solid = Compound([f1.part, f3.part])
